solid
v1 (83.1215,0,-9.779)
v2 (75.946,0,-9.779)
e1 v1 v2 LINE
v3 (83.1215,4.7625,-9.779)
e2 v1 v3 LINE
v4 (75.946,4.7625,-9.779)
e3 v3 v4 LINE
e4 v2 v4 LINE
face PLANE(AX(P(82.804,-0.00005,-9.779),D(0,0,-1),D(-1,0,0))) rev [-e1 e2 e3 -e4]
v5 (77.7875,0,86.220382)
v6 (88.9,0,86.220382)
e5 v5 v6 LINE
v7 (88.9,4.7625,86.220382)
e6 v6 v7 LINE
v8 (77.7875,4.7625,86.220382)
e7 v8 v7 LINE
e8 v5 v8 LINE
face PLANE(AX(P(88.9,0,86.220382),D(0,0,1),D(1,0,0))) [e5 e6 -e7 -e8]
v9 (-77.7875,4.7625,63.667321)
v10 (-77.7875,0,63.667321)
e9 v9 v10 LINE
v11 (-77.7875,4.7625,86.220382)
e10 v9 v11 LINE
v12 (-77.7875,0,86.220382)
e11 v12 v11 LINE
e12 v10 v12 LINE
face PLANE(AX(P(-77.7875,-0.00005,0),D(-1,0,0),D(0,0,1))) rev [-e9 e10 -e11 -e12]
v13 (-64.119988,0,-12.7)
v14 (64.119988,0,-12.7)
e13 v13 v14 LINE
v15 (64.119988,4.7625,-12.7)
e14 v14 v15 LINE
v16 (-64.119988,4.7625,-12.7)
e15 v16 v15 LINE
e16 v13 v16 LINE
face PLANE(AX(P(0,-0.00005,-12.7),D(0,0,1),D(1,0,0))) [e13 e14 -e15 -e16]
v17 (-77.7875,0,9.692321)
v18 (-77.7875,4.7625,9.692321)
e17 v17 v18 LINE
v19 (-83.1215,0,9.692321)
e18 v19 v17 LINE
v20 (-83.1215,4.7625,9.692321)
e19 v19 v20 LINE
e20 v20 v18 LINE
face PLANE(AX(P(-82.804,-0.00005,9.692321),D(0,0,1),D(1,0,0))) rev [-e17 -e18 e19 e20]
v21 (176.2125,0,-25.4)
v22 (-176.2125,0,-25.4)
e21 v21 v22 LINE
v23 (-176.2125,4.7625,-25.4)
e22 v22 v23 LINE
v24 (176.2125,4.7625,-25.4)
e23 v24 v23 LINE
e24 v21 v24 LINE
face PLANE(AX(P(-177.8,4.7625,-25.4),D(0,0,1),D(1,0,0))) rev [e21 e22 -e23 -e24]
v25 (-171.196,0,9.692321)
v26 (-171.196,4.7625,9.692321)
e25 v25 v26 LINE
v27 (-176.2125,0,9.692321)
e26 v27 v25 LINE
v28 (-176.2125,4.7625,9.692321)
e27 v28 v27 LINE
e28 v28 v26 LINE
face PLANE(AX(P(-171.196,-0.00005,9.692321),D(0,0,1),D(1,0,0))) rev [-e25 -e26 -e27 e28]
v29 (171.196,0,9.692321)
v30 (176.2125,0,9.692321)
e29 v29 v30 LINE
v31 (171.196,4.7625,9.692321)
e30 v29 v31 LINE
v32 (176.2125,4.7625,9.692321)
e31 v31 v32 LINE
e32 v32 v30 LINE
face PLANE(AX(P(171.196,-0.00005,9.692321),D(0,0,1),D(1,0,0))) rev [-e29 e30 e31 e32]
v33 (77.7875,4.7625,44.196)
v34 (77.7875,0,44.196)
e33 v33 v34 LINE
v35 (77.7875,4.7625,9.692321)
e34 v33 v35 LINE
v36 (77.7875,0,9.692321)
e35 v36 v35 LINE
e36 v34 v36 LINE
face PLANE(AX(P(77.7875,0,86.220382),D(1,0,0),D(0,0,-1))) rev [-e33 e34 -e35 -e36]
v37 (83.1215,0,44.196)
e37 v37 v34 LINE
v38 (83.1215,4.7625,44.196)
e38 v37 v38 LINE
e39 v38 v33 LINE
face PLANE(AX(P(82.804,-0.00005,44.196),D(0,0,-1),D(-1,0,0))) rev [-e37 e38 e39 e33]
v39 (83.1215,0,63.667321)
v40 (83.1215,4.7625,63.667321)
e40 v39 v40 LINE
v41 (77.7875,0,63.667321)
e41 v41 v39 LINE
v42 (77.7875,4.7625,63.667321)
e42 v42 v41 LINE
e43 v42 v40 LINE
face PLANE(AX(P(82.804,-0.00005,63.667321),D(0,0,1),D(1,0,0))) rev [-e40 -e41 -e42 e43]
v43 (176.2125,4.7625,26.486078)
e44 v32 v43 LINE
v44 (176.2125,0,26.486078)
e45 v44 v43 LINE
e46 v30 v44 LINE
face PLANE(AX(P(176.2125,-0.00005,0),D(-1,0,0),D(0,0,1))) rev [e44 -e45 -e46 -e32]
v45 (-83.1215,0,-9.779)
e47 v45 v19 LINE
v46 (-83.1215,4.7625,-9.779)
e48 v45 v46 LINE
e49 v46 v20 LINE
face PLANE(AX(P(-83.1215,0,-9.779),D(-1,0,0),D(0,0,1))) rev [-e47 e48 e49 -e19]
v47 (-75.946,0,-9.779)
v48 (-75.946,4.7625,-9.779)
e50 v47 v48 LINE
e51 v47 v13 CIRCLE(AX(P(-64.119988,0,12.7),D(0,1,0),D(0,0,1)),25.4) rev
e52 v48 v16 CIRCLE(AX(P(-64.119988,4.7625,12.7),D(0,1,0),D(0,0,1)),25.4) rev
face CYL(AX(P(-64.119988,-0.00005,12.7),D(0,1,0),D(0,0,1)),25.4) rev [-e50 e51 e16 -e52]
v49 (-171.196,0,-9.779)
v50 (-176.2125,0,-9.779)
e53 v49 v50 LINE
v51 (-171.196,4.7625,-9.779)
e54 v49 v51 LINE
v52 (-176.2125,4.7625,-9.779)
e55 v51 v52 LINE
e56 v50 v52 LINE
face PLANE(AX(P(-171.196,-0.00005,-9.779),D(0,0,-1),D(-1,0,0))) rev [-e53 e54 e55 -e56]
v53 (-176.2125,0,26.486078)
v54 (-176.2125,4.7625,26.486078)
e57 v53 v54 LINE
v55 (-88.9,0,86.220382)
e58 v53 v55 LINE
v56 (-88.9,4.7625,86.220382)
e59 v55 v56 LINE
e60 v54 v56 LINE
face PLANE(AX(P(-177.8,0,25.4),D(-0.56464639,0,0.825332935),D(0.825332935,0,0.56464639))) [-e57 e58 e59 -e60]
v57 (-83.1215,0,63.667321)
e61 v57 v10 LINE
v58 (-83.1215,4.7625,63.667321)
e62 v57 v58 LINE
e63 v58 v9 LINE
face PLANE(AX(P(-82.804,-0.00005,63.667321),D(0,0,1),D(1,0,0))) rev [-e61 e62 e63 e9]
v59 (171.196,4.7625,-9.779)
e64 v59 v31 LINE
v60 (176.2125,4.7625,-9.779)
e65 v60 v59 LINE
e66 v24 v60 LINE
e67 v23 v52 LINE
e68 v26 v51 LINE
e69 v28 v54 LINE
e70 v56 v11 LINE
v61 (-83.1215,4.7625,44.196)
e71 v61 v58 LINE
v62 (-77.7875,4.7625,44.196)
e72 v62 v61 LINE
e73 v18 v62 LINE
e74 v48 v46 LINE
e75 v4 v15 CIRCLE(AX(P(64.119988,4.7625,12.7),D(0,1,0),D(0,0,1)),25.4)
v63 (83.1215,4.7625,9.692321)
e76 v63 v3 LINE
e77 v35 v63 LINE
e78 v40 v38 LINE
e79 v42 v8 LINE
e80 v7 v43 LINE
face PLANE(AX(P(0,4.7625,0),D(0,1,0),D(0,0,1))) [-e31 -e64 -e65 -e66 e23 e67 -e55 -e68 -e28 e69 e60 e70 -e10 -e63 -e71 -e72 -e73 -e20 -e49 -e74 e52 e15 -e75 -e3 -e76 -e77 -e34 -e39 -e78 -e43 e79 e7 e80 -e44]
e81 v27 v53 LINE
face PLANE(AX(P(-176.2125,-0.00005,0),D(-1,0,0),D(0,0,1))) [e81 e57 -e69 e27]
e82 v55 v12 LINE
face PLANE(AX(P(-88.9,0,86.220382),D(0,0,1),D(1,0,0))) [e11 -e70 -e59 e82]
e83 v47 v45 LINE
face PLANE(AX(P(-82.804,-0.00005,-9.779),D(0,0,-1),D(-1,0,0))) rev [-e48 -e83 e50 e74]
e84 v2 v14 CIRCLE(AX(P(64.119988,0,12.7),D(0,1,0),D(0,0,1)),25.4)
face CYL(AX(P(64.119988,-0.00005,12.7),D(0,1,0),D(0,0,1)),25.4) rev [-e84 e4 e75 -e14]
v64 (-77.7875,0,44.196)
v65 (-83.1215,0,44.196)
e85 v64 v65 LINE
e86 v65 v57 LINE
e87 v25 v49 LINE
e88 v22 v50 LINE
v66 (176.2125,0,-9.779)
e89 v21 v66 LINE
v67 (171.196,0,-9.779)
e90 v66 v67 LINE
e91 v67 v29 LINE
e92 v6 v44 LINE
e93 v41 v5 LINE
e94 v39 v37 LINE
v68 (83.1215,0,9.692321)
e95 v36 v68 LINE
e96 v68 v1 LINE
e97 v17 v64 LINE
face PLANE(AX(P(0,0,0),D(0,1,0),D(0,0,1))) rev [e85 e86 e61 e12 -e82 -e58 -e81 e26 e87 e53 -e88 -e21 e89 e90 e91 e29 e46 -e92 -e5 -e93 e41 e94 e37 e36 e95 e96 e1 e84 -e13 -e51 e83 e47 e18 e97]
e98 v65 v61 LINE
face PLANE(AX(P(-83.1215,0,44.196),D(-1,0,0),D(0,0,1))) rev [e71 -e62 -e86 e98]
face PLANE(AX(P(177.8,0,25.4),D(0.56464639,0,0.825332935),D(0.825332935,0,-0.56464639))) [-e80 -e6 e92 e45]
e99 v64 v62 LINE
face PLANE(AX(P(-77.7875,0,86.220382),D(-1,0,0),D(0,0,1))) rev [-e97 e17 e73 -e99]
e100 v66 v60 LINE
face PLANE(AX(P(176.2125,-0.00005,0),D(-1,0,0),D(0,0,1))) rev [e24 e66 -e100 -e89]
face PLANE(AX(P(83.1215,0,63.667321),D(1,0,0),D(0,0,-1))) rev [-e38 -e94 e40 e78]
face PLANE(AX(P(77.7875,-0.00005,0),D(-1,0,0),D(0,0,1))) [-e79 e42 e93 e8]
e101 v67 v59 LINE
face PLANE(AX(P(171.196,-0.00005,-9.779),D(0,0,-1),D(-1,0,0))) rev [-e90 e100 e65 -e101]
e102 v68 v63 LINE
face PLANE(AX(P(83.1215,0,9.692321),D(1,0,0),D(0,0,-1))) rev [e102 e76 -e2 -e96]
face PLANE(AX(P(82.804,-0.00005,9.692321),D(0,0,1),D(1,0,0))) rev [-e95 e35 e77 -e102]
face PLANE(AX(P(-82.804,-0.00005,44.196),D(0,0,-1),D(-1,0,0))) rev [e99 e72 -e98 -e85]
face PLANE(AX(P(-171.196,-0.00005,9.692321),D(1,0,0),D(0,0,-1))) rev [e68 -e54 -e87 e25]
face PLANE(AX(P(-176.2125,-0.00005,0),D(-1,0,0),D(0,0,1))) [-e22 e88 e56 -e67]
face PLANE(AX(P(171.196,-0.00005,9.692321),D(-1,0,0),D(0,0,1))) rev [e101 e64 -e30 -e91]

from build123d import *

# Parameters (mm, degrees)
SKETCH1_W           = 355.6
SKETCH1_H           = 50.8
BOSS_EXTRUDE1_DEPTH = 4.7625
BOSS_EXTRUDE2_DEPTH = 4.7625
SKETCH3_W           = 6.858
SKETCH3_H           = 19.471321321
SKETCH3_W_2         = 6.35
SKETCH3_H_2         = 18.963321321
CUT_EXTRUDE1_DEPTH  = 198.660000053
SKETCH4_W           = 1.5875
SKETCH4_H           = 15.621
SKETCH4_H_2         = 22.553060346
CUT_EXTRUDE2_DEPTH  = 198.660000053
CUT_EXTRUDE3_DEPTH  = 197.233230563
SKETCH6_W           = 0.3175
SKETCH6_H           = 19.471321321
CUT_EXTRUDE4_DEPTH  = 197.233230563
SKETCH7_W           = 155.575
SKETCH7_H           = 76.528060346
CUT_EXTRUDE5_DEPTH  = 197.233230563


with BuildPart() as part:
    # Sketch1 → Boss-Extrude1 (new body)
    with BuildSketch(Plane(origin=(0, 0, 0), x_dir=(1, 0, 0), z_dir=(0, 1, 0))):
        Rectangle(SKETCH1_W, SKETCH1_H)
    extrude(amount=BOSS_EXTRUDE1_DEPTH)

    # Sketch2 → Boss-Extrude2 (add)
    with BuildSketch(Plane(origin=(0, 4.7625, 0), x_dir=(1, 0, 0), z_dir=(0, 1, 0))):
        Polygon((177.8, -25.4), (88.9, -86.220381667), (76.2, -86.220381667), (76.2, -25.4), align=None)
        Polygon((-177.8, -25.4), (-88.9, -86.220381667), (-76.2, -86.220381667), (-76.2, -25.4), align=None)
    extrude(amount=-BOSS_EXTRUDE2_DEPTH)

    # Sketch3 → Cut-Extrude1 (cut, through all)
    # profile 1 of 6: a face of its own
    with BuildSketch(Plane(origin=(0, 4.7625, 0), x_dir=(1, 0, 0), z_dir=(0, 1, 0))):
        with Locations((-174.625, 0.043339339)):
            Rectangle(SKETCH3_W, SKETCH3_H)
        with Locations((-174.625, 0.04333934)):
            Rectangle(SKETCH3_W_2, SKETCH3_H_2, mode=Mode.SUBTRACT)
    # profile 2 of 6: a face of its own
    with BuildSketch(Plane(origin=(0, 4.7625, 0), x_dir=(1, 0, 0), z_dir=(0, 1, 0))):
        with Locations((-79.375, -53.931660661)):
            Rectangle(SKETCH3_W, SKETCH3_H)
        with Locations((-79.375, -53.931660661)):
            Rectangle(SKETCH3_W_2, SKETCH3_H_2, mode=Mode.SUBTRACT)
    # profile 3 of 6: a face of its own
    with BuildSketch(Plane(origin=(0, 4.7625, 0), x_dir=(1, 0, 0), z_dir=(0, 1, 0))):
        with Locations((-79.375, 0.043339339)):
            Rectangle(SKETCH3_W, SKETCH3_H)
        with Locations((-79.375, 0.04333934)):
            Rectangle(SKETCH3_W_2, SKETCH3_H_2, mode=Mode.SUBTRACT)
    # profile 4 of 6: a face of its own
    with BuildSketch(Plane(origin=(0, 4.7625, 0), x_dir=(1, 0, 0), z_dir=(0, 1, 0))):
        with Locations((79.375, 0.043339339)):
            Rectangle(SKETCH3_W, SKETCH3_H)
        with Locations((79.375, 0.04333934)):
            Rectangle(SKETCH3_W_2, SKETCH3_H_2, mode=Mode.SUBTRACT)
    # profile 5 of 6: a face of its own
    with BuildSketch(Plane(origin=(0, 4.7625, 0), x_dir=(1, 0, 0), z_dir=(0, 1, 0))):
        with Locations((79.375, -53.931660661)):
            Rectangle(SKETCH3_W, SKETCH3_H)
        with Locations((79.375, -53.931660661)):
            Rectangle(SKETCH3_W_2, SKETCH3_H_2, mode=Mode.SUBTRACT)
    # profile 6 of 6: a face of its own
    with BuildSketch(Plane(origin=(0, 4.7625, 0), x_dir=(1, 0, 0), z_dir=(0, 1, 0))):
        with Locations((174.625, 0.043339339)):
            Rectangle(SKETCH3_W, SKETCH3_H)
        with Locations((174.625, 0.04333934)):
            Rectangle(SKETCH3_W_2, SKETCH3_H_2, mode=Mode.SUBTRACT)
    extrude(amount=-CUT_EXTRUDE1_DEPTH, mode=Mode.SUBTRACT)


with BuildPart() as body_2:
    # of the pieces the cut leaves, the one that is kept (cut_extrude1_keep)
    add(part.part.solids().sort_by_distance((-177.8, 0, -25.4))[0])

    # Sketch4 → Cut-Extrude2 (cut, through all)
    with BuildSketch(Plane(origin=(0, 4.7625, 0), x_dir=(1, 0, 0), z_dir=(0, 1, 0))):
        with Locations((-177.00625, 17.5895)):
            Rectangle(SKETCH4_W, SKETCH4_H)
        with Locations((177.00625, 17.5895)):
            Rectangle(SKETCH4_W, SKETCH4_H)
        Polygon((-176.2125, -26.486078244), (-176.2125, -9.692321321), (-177.8, -9.692321321), (-177.8, -25.4), align=None)
        Polygon((177.8, -9.692321321), (176.2125, -9.692321321), (176.2125, -26.486078244), (177.8, -25.4), align=None)
        with Locations((-76.99375, -74.943851494)):
            Rectangle(SKETCH4_W, SKETCH4_H_2)
        with Locations((76.99375, -74.943851494)):
            Rectangle(SKETCH4_W, SKETCH4_H_2)
    extrude(amount=-CUT_EXTRUDE2_DEPTH, mode=Mode.SUBTRACT)

    # Sketch5 → Cut-Extrude3 (cut, through all)
    with BuildSketch(Plane(origin=(0, 4.7625, 0), x_dir=(1, 0, 0), z_dir=(0, 1, 0))):
        with BuildLine():
            Line((-76.2, -9.692321321), (-76.2, -25.4))
            Line((-76.2, -25.4), (76.2, -25.4))
            Line((76.2, -25.4), (76.2, -9.692321321))
            Line((76.2, -9.692321321), (75.946, -9.692321321))
            Line((75.946, -9.692321321), (75.946, 9.779))
            ThreePointArc((75.946, 9.779), (70.210694069, 11.958939555), (64.119988035, 12.7))
            Line((64.119988035, 12.7), (-64.119988035, 12.7))
            ThreePointArc((-64.119988035, 12.7), (-70.210694069, 11.958939555), (-75.946, 9.779))
            Line((-75.946, 9.779), (-75.946, -9.692321321))
            Line((-75.946, -9.692321321), (-76.2, -9.692321321))
        make_face()
    extrude(amount=-CUT_EXTRUDE3_DEPTH, mode=Mode.SUBTRACT)

    # Sketch6 → Cut-Extrude4 (cut, through all)
    with BuildSketch(Plane(origin=(0, 4.7625, 0), x_dir=(1, 0, 0), z_dir=(0, 1, 0))):
        with Locations((-82.96275, 0.043339339)):
            Rectangle(SKETCH6_W, SKETCH6_H)
        with Locations((-82.96275, -53.931660661)):
            Rectangle(SKETCH6_W, SKETCH6_H)
        with Locations((82.96275, -53.931660661)):
            Rectangle(SKETCH6_W, SKETCH6_H)
        with Locations((82.96275, 0.043339339)):
            Rectangle(SKETCH6_W, SKETCH6_H)
    extrude(amount=-CUT_EXTRUDE4_DEPTH, mode=Mode.SUBTRACT)

    # Sketch7 → Cut-Extrude5 (cut, through all)
    with BuildSketch(Plane(origin=(0, 4.7625, 0), x_dir=(1, 0, 0), z_dir=(0, 1, 0))):
        with Locations((0, -47.956351494)):
            Rectangle(SKETCH7_W, SKETCH7_H)
    extrude(amount=-CUT_EXTRUDE5_DEPTH, mode=Mode.SUBTRACT)


solid = body_2.part
